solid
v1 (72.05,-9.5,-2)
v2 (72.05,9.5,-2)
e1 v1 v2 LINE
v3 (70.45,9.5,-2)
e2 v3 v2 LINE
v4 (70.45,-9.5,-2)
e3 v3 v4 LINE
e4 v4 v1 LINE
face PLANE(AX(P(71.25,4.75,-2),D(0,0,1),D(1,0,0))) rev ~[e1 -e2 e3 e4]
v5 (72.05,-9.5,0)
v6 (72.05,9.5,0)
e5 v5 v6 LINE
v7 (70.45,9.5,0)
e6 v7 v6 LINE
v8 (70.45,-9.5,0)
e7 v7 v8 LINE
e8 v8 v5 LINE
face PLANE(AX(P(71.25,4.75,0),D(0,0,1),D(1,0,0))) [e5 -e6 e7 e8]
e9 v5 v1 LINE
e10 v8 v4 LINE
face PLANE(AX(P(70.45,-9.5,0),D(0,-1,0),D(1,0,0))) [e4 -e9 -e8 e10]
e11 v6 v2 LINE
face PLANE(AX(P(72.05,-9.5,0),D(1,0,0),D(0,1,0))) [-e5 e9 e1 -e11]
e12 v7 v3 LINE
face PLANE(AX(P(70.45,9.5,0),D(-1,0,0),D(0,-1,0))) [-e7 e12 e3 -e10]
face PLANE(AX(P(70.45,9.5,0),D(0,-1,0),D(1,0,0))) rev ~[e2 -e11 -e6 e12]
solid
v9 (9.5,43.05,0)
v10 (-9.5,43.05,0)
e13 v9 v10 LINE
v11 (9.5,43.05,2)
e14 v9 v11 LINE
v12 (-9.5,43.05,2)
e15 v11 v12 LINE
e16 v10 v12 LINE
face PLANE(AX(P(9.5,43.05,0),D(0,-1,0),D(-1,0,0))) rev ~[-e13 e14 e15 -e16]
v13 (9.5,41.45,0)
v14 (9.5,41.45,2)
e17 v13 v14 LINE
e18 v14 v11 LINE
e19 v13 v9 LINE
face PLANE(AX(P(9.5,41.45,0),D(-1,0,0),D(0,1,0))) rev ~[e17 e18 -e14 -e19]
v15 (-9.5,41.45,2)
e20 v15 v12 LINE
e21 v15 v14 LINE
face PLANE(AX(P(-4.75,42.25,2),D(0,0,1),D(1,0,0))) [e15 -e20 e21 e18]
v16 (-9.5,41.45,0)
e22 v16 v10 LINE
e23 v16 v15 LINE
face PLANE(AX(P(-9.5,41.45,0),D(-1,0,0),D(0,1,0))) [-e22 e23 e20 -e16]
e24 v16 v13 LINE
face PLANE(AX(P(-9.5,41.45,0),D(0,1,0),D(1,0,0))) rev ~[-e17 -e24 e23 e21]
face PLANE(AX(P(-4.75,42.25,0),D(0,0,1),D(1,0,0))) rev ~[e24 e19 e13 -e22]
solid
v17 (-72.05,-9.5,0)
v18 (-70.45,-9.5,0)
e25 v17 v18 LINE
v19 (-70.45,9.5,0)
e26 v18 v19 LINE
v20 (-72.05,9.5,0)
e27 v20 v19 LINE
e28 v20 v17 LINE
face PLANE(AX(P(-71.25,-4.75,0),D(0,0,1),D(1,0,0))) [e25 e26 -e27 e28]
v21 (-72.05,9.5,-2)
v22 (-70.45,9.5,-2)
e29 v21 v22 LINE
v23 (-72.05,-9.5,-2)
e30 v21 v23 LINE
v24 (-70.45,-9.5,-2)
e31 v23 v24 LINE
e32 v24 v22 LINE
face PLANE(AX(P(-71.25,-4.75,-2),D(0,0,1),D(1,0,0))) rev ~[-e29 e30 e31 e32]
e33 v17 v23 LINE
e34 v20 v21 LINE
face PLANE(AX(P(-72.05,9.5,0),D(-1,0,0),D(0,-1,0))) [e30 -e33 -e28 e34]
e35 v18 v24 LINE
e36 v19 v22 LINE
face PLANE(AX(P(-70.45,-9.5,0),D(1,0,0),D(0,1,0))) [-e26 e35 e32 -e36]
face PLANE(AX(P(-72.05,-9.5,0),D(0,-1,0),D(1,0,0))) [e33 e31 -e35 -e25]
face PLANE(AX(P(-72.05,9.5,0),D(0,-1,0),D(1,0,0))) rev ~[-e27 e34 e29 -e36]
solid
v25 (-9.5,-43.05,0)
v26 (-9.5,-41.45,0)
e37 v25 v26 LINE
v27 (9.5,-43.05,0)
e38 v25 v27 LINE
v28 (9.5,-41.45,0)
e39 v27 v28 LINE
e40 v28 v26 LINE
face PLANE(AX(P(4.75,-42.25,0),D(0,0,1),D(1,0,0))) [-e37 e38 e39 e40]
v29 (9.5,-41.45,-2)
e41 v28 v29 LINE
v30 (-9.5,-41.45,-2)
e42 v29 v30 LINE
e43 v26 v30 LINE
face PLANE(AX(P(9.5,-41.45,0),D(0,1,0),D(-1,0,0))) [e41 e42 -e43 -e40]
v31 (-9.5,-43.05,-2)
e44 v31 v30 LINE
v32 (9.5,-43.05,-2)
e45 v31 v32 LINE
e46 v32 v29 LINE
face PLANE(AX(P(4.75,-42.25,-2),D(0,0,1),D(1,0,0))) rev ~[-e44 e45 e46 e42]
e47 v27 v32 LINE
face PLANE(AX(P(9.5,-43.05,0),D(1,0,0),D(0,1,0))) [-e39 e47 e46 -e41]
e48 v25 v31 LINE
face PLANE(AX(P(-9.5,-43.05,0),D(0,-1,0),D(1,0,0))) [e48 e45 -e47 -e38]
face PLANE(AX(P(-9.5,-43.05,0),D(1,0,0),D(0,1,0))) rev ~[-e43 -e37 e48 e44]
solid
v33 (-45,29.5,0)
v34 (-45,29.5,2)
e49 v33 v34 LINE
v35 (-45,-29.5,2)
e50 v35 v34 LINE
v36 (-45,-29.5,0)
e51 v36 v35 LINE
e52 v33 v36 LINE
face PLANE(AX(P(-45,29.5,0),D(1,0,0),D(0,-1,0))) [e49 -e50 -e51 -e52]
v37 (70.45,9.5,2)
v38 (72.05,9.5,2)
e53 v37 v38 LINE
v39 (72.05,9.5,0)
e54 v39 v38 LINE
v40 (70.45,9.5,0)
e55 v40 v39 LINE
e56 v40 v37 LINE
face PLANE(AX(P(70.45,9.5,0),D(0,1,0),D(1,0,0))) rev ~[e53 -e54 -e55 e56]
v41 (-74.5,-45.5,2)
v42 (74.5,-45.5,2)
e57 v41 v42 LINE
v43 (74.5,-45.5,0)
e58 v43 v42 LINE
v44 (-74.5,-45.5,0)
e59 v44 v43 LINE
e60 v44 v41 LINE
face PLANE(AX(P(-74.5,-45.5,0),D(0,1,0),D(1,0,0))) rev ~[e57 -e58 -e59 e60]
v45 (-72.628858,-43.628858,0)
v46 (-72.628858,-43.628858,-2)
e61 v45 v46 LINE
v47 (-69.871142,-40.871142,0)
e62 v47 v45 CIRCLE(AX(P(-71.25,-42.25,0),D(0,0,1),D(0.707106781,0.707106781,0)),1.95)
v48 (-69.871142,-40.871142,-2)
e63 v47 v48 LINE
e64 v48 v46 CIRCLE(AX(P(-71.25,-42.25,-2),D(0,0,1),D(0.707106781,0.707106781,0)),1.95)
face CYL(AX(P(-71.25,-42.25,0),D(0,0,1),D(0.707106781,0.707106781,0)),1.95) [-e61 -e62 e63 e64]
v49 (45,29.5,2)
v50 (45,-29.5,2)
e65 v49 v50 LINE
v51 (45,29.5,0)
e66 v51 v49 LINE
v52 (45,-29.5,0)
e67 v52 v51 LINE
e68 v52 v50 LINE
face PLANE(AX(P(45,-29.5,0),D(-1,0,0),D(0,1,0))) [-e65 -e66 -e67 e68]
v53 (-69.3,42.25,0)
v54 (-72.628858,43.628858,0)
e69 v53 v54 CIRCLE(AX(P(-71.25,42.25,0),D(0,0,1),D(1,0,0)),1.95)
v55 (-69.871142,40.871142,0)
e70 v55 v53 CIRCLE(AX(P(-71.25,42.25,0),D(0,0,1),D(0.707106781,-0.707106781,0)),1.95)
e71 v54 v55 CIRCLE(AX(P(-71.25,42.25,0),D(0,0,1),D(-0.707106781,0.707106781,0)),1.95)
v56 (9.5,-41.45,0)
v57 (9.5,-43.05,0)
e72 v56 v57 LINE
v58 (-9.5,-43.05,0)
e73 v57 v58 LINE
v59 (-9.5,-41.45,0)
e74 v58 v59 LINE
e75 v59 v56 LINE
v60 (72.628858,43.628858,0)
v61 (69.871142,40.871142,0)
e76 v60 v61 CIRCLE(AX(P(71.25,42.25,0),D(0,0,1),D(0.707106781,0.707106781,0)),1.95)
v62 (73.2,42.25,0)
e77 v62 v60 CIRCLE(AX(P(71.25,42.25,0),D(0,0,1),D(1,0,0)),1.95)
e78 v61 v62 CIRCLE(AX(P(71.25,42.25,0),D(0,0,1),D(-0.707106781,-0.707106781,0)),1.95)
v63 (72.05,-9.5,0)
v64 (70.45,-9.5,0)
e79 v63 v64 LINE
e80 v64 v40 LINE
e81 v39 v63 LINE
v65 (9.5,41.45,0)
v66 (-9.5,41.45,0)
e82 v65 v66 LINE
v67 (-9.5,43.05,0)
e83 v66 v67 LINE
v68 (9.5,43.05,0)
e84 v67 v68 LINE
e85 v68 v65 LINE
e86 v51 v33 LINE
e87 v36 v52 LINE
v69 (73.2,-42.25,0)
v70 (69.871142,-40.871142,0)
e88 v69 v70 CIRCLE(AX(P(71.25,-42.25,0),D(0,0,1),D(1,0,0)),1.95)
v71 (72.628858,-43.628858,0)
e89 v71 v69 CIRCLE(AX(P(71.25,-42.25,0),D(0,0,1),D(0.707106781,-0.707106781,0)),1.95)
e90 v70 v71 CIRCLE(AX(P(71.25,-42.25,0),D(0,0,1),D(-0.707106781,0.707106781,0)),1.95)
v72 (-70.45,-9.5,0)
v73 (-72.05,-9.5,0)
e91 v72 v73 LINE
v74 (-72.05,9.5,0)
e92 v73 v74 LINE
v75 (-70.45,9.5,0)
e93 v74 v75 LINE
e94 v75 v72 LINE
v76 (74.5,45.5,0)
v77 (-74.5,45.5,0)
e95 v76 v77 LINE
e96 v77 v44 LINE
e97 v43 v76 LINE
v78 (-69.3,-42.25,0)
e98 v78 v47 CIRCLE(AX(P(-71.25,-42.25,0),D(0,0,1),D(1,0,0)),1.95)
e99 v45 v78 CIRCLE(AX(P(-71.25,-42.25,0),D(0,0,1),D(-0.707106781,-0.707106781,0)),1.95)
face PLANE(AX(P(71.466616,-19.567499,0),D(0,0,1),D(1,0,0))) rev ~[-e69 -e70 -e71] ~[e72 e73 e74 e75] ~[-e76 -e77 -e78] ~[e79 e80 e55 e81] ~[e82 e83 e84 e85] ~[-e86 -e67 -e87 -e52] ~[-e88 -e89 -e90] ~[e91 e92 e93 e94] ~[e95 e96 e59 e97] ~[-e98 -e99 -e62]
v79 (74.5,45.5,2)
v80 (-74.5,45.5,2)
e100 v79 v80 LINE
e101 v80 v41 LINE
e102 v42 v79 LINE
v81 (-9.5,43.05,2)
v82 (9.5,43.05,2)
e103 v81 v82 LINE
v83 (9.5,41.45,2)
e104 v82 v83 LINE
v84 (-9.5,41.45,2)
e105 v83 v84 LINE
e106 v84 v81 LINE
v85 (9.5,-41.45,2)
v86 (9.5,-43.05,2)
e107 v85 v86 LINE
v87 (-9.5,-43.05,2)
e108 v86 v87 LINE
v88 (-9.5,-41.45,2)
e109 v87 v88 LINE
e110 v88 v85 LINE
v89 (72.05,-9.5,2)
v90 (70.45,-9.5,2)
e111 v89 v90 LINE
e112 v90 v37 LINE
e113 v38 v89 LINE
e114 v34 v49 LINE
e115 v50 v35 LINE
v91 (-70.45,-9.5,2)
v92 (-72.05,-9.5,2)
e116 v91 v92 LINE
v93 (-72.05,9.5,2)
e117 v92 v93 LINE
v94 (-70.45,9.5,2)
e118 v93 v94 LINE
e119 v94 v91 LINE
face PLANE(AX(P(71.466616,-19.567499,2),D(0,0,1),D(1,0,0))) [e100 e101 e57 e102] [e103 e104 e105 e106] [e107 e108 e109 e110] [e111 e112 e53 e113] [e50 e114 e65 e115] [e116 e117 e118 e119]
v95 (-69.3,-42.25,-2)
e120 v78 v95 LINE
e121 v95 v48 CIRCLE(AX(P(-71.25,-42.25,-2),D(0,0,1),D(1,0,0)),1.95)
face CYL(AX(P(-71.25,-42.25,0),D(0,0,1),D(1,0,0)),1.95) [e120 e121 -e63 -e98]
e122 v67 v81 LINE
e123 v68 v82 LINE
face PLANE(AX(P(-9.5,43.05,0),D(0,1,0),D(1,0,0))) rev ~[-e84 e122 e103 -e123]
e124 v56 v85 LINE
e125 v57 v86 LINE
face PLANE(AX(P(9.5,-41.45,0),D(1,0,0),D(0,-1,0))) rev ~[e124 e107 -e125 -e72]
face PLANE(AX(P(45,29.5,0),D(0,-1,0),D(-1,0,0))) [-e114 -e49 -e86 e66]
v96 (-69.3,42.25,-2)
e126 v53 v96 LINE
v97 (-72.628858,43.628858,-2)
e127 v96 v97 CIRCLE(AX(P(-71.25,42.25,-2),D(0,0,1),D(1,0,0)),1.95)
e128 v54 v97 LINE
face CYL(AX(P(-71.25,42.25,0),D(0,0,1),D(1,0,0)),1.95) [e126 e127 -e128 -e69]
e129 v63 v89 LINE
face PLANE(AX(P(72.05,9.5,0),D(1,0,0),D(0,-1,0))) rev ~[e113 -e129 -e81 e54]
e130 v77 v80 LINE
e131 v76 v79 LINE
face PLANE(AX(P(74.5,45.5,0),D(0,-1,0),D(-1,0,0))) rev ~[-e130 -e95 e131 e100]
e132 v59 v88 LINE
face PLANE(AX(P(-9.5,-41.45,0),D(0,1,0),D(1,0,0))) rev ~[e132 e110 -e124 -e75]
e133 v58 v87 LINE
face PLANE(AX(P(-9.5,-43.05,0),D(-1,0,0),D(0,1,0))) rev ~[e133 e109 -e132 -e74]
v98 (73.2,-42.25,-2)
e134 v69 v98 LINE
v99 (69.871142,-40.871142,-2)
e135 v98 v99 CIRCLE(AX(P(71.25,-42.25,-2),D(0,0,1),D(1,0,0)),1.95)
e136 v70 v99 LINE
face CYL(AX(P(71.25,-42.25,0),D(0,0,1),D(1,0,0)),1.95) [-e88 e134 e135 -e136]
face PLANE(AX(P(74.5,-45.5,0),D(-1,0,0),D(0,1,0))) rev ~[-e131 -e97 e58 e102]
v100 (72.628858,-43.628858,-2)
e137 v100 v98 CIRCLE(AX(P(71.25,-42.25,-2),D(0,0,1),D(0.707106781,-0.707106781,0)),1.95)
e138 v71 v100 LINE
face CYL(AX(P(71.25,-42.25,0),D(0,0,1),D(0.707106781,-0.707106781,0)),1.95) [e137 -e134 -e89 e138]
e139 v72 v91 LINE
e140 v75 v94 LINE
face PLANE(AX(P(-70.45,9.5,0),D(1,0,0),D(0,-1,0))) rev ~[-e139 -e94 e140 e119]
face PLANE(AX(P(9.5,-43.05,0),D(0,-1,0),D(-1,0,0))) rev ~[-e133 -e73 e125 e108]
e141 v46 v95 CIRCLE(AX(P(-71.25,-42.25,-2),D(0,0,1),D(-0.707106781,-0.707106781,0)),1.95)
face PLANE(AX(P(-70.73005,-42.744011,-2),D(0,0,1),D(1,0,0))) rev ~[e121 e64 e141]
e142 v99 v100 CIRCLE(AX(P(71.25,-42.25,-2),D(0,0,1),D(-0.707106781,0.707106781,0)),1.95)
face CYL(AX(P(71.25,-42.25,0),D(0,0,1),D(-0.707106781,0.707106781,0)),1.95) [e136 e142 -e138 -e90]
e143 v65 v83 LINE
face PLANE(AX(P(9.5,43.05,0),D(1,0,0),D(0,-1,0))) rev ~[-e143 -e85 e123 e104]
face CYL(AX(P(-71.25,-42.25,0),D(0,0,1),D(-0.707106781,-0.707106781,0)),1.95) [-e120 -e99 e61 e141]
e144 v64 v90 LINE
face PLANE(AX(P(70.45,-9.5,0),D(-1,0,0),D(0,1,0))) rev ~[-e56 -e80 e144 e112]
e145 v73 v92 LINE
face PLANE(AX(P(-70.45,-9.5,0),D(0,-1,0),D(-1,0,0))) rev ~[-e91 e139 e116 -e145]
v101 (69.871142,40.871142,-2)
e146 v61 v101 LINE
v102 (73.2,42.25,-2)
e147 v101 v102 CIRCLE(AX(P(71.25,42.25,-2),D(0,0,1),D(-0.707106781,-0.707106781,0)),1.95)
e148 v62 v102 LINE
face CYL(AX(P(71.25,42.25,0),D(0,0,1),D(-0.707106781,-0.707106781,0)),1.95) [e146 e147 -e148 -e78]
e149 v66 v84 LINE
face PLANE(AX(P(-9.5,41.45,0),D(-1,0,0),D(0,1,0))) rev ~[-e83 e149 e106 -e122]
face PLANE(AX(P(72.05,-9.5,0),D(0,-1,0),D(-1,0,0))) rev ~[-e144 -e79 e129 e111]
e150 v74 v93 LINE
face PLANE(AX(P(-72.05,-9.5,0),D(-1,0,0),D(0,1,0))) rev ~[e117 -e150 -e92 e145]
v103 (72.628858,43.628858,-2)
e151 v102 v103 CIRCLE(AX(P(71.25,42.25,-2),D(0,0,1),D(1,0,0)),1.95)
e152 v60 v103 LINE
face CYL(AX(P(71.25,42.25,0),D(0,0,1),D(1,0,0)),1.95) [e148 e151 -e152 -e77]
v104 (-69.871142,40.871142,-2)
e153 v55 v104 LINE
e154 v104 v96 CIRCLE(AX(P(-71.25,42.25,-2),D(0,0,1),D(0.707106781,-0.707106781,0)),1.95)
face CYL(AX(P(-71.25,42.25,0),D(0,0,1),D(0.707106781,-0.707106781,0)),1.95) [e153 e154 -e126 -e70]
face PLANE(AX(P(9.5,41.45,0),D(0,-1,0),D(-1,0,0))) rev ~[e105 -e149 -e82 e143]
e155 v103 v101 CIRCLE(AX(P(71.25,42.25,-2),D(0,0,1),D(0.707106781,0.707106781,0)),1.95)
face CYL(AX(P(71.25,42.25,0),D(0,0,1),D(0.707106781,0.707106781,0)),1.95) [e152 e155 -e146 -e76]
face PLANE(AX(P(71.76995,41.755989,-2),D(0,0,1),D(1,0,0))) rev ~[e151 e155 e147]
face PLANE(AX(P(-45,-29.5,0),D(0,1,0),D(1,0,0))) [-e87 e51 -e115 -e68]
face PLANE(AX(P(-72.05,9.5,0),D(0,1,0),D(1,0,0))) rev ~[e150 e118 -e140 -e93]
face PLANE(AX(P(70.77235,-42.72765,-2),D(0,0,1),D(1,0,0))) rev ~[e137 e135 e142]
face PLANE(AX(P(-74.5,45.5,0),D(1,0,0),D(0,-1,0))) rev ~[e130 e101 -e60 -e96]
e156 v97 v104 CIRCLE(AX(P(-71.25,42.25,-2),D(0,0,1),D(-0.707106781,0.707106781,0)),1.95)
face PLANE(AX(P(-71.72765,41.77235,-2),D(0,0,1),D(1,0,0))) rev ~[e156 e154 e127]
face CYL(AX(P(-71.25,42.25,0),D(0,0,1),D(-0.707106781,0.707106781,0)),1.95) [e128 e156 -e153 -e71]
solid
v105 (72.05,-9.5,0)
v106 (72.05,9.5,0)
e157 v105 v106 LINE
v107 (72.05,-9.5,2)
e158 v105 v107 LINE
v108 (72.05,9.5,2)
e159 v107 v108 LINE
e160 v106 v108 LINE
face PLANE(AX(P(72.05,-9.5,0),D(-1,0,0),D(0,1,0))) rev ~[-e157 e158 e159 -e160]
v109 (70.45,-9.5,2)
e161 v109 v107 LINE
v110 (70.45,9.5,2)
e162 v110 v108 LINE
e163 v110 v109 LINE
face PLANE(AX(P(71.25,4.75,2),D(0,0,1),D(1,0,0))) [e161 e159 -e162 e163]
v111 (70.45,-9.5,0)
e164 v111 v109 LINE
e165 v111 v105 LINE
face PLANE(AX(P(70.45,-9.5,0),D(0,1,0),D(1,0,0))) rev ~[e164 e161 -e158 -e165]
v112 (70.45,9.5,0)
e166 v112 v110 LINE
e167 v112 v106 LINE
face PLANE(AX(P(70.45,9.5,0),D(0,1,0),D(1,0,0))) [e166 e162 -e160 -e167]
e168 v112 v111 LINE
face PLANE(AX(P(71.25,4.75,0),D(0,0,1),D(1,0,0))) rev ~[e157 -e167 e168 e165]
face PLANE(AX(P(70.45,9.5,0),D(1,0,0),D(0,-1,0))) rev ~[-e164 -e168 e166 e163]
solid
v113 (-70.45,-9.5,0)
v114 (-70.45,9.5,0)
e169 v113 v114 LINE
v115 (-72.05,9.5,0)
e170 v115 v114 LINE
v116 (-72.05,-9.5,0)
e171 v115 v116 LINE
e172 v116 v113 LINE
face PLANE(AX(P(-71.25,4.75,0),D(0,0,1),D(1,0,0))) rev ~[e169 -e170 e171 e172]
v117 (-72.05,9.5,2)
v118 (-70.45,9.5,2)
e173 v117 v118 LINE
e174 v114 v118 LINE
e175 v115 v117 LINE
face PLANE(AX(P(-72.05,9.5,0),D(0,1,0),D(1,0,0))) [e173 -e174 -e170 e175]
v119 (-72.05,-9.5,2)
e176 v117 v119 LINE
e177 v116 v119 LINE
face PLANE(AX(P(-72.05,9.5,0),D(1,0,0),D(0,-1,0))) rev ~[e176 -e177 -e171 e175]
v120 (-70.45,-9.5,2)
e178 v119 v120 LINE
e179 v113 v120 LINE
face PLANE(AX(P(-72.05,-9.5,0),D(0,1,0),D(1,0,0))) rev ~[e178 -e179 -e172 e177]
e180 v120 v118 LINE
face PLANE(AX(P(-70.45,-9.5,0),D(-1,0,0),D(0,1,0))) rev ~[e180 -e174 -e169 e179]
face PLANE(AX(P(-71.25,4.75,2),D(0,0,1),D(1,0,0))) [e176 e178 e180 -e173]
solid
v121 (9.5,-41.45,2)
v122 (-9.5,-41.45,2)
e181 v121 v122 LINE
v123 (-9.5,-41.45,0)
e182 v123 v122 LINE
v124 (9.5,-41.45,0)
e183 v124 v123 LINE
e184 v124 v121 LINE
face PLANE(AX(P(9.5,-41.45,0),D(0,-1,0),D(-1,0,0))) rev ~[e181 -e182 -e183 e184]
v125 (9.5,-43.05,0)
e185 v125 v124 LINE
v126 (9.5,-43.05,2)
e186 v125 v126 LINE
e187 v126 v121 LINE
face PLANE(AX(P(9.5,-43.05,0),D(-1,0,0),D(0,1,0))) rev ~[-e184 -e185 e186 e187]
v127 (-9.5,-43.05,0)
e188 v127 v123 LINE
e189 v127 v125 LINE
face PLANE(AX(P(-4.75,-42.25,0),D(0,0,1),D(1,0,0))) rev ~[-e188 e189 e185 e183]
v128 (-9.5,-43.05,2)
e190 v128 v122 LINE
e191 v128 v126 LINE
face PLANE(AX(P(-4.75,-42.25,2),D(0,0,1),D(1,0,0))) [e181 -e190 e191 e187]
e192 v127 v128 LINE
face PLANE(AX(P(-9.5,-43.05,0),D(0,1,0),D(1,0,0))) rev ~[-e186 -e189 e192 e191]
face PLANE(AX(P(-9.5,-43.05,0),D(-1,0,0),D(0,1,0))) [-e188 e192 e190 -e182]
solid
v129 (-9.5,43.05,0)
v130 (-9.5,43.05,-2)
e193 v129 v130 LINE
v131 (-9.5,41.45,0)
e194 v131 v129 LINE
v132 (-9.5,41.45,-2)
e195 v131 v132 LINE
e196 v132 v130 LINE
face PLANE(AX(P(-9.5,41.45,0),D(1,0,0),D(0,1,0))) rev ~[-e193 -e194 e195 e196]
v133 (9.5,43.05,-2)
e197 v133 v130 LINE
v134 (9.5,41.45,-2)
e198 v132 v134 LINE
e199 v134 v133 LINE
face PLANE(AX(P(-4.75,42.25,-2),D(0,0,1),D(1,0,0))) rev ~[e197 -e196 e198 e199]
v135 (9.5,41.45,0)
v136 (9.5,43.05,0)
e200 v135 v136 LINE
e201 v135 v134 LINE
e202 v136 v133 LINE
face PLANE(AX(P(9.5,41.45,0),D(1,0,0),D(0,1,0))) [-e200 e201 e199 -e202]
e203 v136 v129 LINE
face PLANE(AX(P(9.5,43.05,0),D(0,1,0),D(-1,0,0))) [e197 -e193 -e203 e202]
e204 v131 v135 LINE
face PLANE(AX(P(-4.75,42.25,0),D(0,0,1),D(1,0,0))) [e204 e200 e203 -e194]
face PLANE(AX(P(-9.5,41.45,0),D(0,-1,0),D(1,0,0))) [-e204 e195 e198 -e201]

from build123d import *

# Parameters (mm, degrees)
F1_DEPTH = 2
F2_DEPTH = 5
F3_DEPTH = 2
F0_W     = 1.6
F0_H     = 9.5
F0_W_2   = 9.5
F0_H_2   = 1.6
F4_DEPTH = 2


# Not quite as in the source:
# - a feature names something its author has since deleted; it is built from what else it names


with BuildPart() as f1:
    # F0 (on Top) → F1 (new body)
    with BuildSketch(Plane.XY):
        with BuildLine():
            Line((72.6288582233, -43.6288582233), (74.5, -45.5))
            Line((74.5, -45.5), (74.5, 0))
            Line((74.5, 0), (72.05, 0))
            Line((72.05, 0), (72.05, -9.5))
            Line((72.05, -9.5), (70.45, -9.5))
            Line((70.45, -9.5), (70.45, 0))
            Line((70.45, 0), (68, 0))
            Line((68, 0), (68, -39))
            Line((68, -39), (69.8711417767, -40.8711417767))
            ThreePointArc((69.8711417767, -40.8711417767), (71.9962326931, -40.4484349116), (73.2, -42.25))
            ThreePointArc((73.2, -42.25), (73.0515650884, -42.9962326931), (72.6288582233, -43.6288582233))
        make_face()
        with BuildLine():
            Line((0, -45.5), (74.5, -45.5))
            Line((74.5, -45.5), (72.6288582233, -43.6288582233))
            ThreePointArc((72.6288582233, -43.6288582233), (69.8711417767, -43.6288582233), (69.8711417767, -40.8711417767))
            Line((69.8711417767, -40.8711417767), (68, -39))
            Line((68, -39), (0, -39))
            Line((0, -39), (0, -41.45))
            Line((0, -41.45), (9.5, -41.45))
            Line((9.5, -41.45), (9.5, -43.05))
            Line((9.5, -43.05), (0, -43.05))
            Line((0, -43.05), (0, -45.5))
        make_face()
        with BuildLine():
            Line((-74.5, -45.5), (0, -45.5))
            Line((0, -45.5), (0, -43.05))
            Line((0, -43.05), (-9.5, -43.05))
            Line((-9.5, -43.05), (-9.5, -41.45))
            Line((-9.5, -41.45), (0, -41.45))
            Line((0, -41.45), (0, -39))
            Line((0, -39), (-68, -39))
            Line((-68, -39), (-69.8711417767, -40.8711417767))
            ThreePointArc((-69.8711417767, -40.8711417767), (-69.4484349116, -41.5037673069), (-69.3, -42.25))
            ThreePointArc((-69.3, -42.25), (-70.5037673069, -44.0515650884), (-72.6288582233, -43.6288582233))
            Line((-72.6288582233, -43.6288582233), (-74.5, -45.5))
        make_face()
        with BuildLine():
            Line((72.05, 0), (74.5, 0))
            Line((74.5, 0), (74.5, 45.5))
            Line((74.5, 45.5), (72.6288582233, 43.6288582233))
            ThreePointArc((72.6288582233, 43.6288582233), (73.0515650884, 42.9962326931), (73.2, 42.25))
            ThreePointArc((73.2, 42.25), (71.9962326931, 40.4484349116), (69.8711417767, 40.8711417767))
            Line((69.8711417767, 40.8711417767), (68, 39))
            Line((68, 39), (68, 0))
            Line((68, 0), (70.45, 0))
            Line((70.45, 0), (70.45, 9.5))
            Line((70.45, 9.5), (72.05, 9.5))
            Line((72.05, 9.5), (72.05, 0))
        make_face()
        with BuildLine():
            ThreePointArc((69.8711417767, -40.8711417767), (69.8711417767, -43.6288582233), (72.6288582233, -43.6288582233))
            Line((72.6288582233, -43.6288582233), (69.8711417767, -40.8711417767))
        make_face()
        with BuildLine():
            Line((69.8711417767, -40.8711417767), (72.6288582233, -43.6288582233))
            ThreePointArc((72.6288582233, -43.6288582233), (73.0515650884, -42.9962326931), (73.2, -42.25))
            ThreePointArc((73.2, -42.25), (71.9962326931, -40.4484349116), (69.8711417767, -40.8711417767))
        make_face()
        with BuildLine():
            Line((-74.5, 0), (-74.5, -45.5))
            Line((-74.5, -45.5), (-72.6288582233, -43.6288582233))
            ThreePointArc((-72.6288582233, -43.6288582233), (-72.6288582233, -40.8711417767), (-69.8711417767, -40.8711417767))
            Line((-69.8711417767, -40.8711417767), (-68, -39))
            Line((-68, -39), (-68, 0))
            Line((-68, 0), (-70.45, 0))
            Line((-70.45, 0), (-70.45, -9.5))
            Line((-70.45, -9.5), (-72.05, -9.5))
            Line((-72.05, -9.5), (-72.05, 0))
            Line((-72.05, 0), (-74.5, 0))
        make_face()
        with BuildLine():
            Line((72.6288582233, 43.6288582233), (74.5, 45.5))
            Line((74.5, 45.5), (0, 45.5))
            Line((0, 45.5), (0, 43.05))
            Line((0, 43.05), (9.5, 43.05))
            Line((9.5, 43.05), (9.5, 41.45))
            Line((9.5, 41.45), (0, 41.45))
            Line((0, 41.45), (0, 39))
            Line((0, 39), (68, 39))
            Line((68, 39), (69.8711417767, 40.8711417767))
            ThreePointArc((69.8711417767, 40.8711417767), (69.8711417767, 43.6288582233), (72.6288582233, 43.6288582233))
        make_face()
        with BuildLine():
            Line((-74.5, 45.5), (-74.5, 0))
            Line((-74.5, 0), (-72.05, 0))
            Line((-72.05, 0), (-72.05, 9.5))
            Line((-72.05, 9.5), (-70.45, 9.5))
            Line((-70.45, 9.5), (-70.45, 0))
            Line((-70.45, 0), (-68, 0))
            Line((-68, 0), (-68, 39))
            Line((-68, 39), (-69.8711417767, 40.8711417767))
            ThreePointArc((-69.8711417767, 40.8711417767), (-72.6288582233, 40.8711417767), (-72.6288582233, 43.6288582233))
            Line((-72.6288582233, 43.6288582233), (-74.5, 45.5))
        make_face()
        with BuildLine():
            ThreePointArc((-69.8711417767, -40.8711417767), (-72.6288582233, -40.8711417767), (-72.6288582233, -43.6288582233))
            Line((-72.6288582233, -43.6288582233), (-69.8711417767, -40.8711417767))
        make_face()
        with BuildLine():
            Line((-69.8711417767, -40.8711417767), (-72.6288582233, -43.6288582233))
            ThreePointArc((-72.6288582233, -43.6288582233), (-70.5037673069, -44.0515650884), (-69.3, -42.25))
            ThreePointArc((-69.3, -42.25), (-69.4484349116, -41.5037673069), (-69.8711417767, -40.8711417767))
        make_face()
        with BuildLine():
            Line((0, 43.05), (0, 45.5))
            Line((0, 45.5), (-74.5, 45.5))
            Line((-74.5, 45.5), (-72.6288582233, 43.6288582233))
            ThreePointArc((-72.6288582233, 43.6288582233), (-70.5037673069, 44.0515650884), (-69.3, 42.25))
            ThreePointArc((-69.3, 42.25), (-69.4484349116, 41.5037673069), (-69.8711417767, 40.8711417767))
            Line((-69.8711417767, 40.8711417767), (-68, 39))
            Line((-68, 39), (0, 39))
            Line((0, 39), (0, 41.45))
            Line((0, 41.45), (-9.5, 41.45))
            Line((-9.5, 41.45), (-9.5, 43.05))
            Line((-9.5, 43.05), (0, 43.05))
        make_face()
        with BuildLine():
            ThreePointArc((73.2, 42.25), (73.0515650884, 42.9962326931), (72.6288582233, 43.6288582233))
            Line((72.6288582233, 43.6288582233), (69.8711417767, 40.8711417767))
            ThreePointArc((69.8711417767, 40.8711417767), (71.9962326931, 40.4484349116), (73.2, 42.25))
        make_face()
        with BuildLine():
            Line((69.8711417767, 40.8711417767), (72.6288582233, 43.6288582233))
            ThreePointArc((72.6288582233, 43.6288582233), (69.8711417767, 43.6288582233), (69.8711417767, 40.8711417767))
        make_face()
        Polygon((0, -39), (68, -39), (68, 0), (45, 0), (45, -29.5), (0, -29.5), align=None)
        Polygon((-68, -39), (0, -39), (0, -29.5), (-45, -29.5), (-45, 0), (-68, 0), align=None)
        Polygon((45, 0), (68, 0), (68, 39), (0, 39), (0, 29.5), (45, 29.5), align=None)
        with BuildLine():
            ThreePointArc((-69.3, 42.25), (-70.5037673069, 44.0515650884), (-72.6288582233, 43.6288582233))
            Line((-72.6288582233, 43.6288582233), (-69.8711417767, 40.8711417767))
            ThreePointArc((-69.8711417767, 40.8711417767), (-69.4484349116, 41.5037673069), (-69.3, 42.25))
        make_face()
        with BuildLine():
            Line((-69.8711417767, 40.8711417767), (-72.6288582233, 43.6288582233))
            ThreePointArc((-72.6288582233, 43.6288582233), (-72.6288582233, 40.8711417767), (-69.8711417767, 40.8711417767))
        make_face()
        Polygon((-45, -29.5), (0, -29.5), (45, -29.5), (45, 0), (45, 29.5), (0, 29.5), (-45, 29.5), (-45, 0), align=None)
        Polygon((-68, 39), (-68, 0), (-45, 0), (-45, 29.5), (0, 29.5), (0, 39), align=None)
    extrude(amount=F1_DEPTH)

    # F0 (on Top) → F2 (cut)
    with BuildSketch(Plane.XY):
        Polygon((-45, -29.5), (0, -29.5), (45, -29.5), (45, 0), (45, 29.5), (0, 29.5), (-45, 29.5), (-45, 0), align=None)
    extrude(amount=F2_DEPTH, mode=Mode.SUBTRACT)

    # F0 (on Top) → F3 (join)
    with BuildSketch(Plane.XY):
        with BuildLine():
            ThreePointArc((73.2, 42.25), (73.0515650884, 42.9962326931), (72.6288582233, 43.6288582233))
            Line((72.6288582233, 43.6288582233), (69.8711417767, 40.8711417767))
            ThreePointArc((69.8711417767, 40.8711417767), (71.9962326931, 40.4484349116), (73.2, 42.25))
        make_face()
        with BuildLine():
            Line((69.8711417767, 40.8711417767), (72.6288582233, 43.6288582233))
            ThreePointArc((72.6288582233, 43.6288582233), (69.8711417767, 43.6288582233), (69.8711417767, 40.8711417767))
        make_face()
        with BuildLine():
            Line((-69.8711417767, 40.8711417767), (-72.6288582233, 43.6288582233))
            ThreePointArc((-72.6288582233, 43.6288582233), (-72.6288582233, 40.8711417767), (-69.8711417767, 40.8711417767))
        make_face()
        with BuildLine():
            ThreePointArc((-69.3, 42.25), (-70.5037673069, 44.0515650884), (-72.6288582233, 43.6288582233))
            Line((-72.6288582233, 43.6288582233), (-69.8711417767, 40.8711417767))
            ThreePointArc((-69.8711417767, 40.8711417767), (-69.4484349116, 41.5037673069), (-69.3, 42.25))
        make_face()
        with BuildLine():
            Line((-69.8711417767, -40.8711417767), (-72.6288582233, -43.6288582233))
            ThreePointArc((-72.6288582233, -43.6288582233), (-70.5037673069, -44.0515650884), (-69.3, -42.25))
            ThreePointArc((-69.3, -42.25), (-69.4484349116, -41.5037673069), (-69.8711417767, -40.8711417767))
        make_face()
        with BuildLine():
            ThreePointArc((-69.8711417767, -40.8711417767), (-72.6288582233, -40.8711417767), (-72.6288582233, -43.6288582233))
            Line((-72.6288582233, -43.6288582233), (-69.8711417767, -40.8711417767))
        make_face()
        with BuildLine():
            ThreePointArc((69.8711417767, -40.8711417767), (69.8711417767, -43.6288582233), (72.6288582233, -43.6288582233))
            Line((72.6288582233, -43.6288582233), (69.8711417767, -40.8711417767))
        make_face()
        with BuildLine():
            Line((69.8711417767, -40.8711417767), (72.6288582233, -43.6288582233))
            ThreePointArc((72.6288582233, -43.6288582233), (73.0515650884, -42.9962326931), (73.2, -42.25))
            ThreePointArc((73.2, -42.25), (71.9962326931, -40.4484349116), (69.8711417767, -40.8711417767))
        make_face()
    extrude(amount=-F3_DEPTH)


with BuildPart() as f3:
    # F0 (on Top) → F3, piece 2 (new body)
    with BuildSketch(Plane.XY):
        with Locations((-71.25, -4.75)):
            Rectangle(F0_W, F0_H)
        with Locations((-71.25, 4.75)):
            Rectangle(F0_W, F0_H)
    extrude(amount=-F3_DEPTH)


with BuildPart() as f3b:
    # F0 (on Top) → F3, piece 3 (new body)
    with BuildSketch(Plane.XY):
        with Locations((-4.75, 42.25)):
            Rectangle(F0_W_2, F0_H_2)
        with Locations((4.75, 42.25)):
            Rectangle(F0_W_2, F0_H_2)
    extrude(amount=-F3_DEPTH)


with BuildPart() as f3c:
    # F0 (on Top) → F3, piece 4 (new body)
    with BuildSketch(Plane.XY):
        with Locations((71.25, 4.75)):
            Rectangle(F0_W, F0_H)
        with Locations((71.25, -4.75)):
            Rectangle(F0_W, F0_H)
    extrude(amount=-F3_DEPTH)


with BuildPart() as f3d:
    # F0 (on Top) → F3, piece 5 (new body)
    with BuildSketch(Plane.XY):
        with Locations((4.75, -42.25)):
            Rectangle(F0_W_2, F0_H_2)
        with Locations((-4.75, -42.25)):
            Rectangle(F0_W_2, F0_H_2)
    extrude(amount=-F3_DEPTH)


with BuildPart() as f4:
    # F0 (on Top) → F4 (new body)
    with BuildSketch(Plane.XY):
        with Locations((-4.75, 42.25)):
            Rectangle(F0_W_2, F0_H_2)
        with Locations((4.75, 42.25)):
            Rectangle(F0_W_2, F0_H_2)
    extrude(amount=F4_DEPTH)


with BuildPart() as f4b:
    # F0 (on Top) → F4, piece 2 (new body)
    with BuildSketch(Plane.XY):
        with Locations((-71.25, 4.75)):
            Rectangle(F0_W, F0_H)
        with Locations((-71.25, -4.75)):
            Rectangle(F0_W, F0_H)
    extrude(amount=F4_DEPTH)


with BuildPart() as f4c:
    # F0 (on Top) → F4, piece 3 (new body)
    with BuildSketch(Plane.XY):
        with Locations((71.25, 4.75)):
            Rectangle(F0_W, F0_H)
        with Locations((71.25, -4.75)):
            Rectangle(F0_W, F0_H)
    extrude(amount=F4_DEPTH)


with BuildPart() as f4d:
    # F0 (on Top) → F4, piece 4 (new body)
    with BuildSketch(Plane.XY):
        with Locations((-4.75, -42.25)):
            Rectangle(F0_W_2, F0_H_2)
        with Locations((4.75, -42.25)):
            Rectangle(F0_W_2, F0_H_2)
    extrude(amount=F4_DEPTH)


solid = Compound([f1.part, f3.part, f3b.part, f3c.part, f3d.part, f4.part, f4b.part, f4c.part, f4d.part])
